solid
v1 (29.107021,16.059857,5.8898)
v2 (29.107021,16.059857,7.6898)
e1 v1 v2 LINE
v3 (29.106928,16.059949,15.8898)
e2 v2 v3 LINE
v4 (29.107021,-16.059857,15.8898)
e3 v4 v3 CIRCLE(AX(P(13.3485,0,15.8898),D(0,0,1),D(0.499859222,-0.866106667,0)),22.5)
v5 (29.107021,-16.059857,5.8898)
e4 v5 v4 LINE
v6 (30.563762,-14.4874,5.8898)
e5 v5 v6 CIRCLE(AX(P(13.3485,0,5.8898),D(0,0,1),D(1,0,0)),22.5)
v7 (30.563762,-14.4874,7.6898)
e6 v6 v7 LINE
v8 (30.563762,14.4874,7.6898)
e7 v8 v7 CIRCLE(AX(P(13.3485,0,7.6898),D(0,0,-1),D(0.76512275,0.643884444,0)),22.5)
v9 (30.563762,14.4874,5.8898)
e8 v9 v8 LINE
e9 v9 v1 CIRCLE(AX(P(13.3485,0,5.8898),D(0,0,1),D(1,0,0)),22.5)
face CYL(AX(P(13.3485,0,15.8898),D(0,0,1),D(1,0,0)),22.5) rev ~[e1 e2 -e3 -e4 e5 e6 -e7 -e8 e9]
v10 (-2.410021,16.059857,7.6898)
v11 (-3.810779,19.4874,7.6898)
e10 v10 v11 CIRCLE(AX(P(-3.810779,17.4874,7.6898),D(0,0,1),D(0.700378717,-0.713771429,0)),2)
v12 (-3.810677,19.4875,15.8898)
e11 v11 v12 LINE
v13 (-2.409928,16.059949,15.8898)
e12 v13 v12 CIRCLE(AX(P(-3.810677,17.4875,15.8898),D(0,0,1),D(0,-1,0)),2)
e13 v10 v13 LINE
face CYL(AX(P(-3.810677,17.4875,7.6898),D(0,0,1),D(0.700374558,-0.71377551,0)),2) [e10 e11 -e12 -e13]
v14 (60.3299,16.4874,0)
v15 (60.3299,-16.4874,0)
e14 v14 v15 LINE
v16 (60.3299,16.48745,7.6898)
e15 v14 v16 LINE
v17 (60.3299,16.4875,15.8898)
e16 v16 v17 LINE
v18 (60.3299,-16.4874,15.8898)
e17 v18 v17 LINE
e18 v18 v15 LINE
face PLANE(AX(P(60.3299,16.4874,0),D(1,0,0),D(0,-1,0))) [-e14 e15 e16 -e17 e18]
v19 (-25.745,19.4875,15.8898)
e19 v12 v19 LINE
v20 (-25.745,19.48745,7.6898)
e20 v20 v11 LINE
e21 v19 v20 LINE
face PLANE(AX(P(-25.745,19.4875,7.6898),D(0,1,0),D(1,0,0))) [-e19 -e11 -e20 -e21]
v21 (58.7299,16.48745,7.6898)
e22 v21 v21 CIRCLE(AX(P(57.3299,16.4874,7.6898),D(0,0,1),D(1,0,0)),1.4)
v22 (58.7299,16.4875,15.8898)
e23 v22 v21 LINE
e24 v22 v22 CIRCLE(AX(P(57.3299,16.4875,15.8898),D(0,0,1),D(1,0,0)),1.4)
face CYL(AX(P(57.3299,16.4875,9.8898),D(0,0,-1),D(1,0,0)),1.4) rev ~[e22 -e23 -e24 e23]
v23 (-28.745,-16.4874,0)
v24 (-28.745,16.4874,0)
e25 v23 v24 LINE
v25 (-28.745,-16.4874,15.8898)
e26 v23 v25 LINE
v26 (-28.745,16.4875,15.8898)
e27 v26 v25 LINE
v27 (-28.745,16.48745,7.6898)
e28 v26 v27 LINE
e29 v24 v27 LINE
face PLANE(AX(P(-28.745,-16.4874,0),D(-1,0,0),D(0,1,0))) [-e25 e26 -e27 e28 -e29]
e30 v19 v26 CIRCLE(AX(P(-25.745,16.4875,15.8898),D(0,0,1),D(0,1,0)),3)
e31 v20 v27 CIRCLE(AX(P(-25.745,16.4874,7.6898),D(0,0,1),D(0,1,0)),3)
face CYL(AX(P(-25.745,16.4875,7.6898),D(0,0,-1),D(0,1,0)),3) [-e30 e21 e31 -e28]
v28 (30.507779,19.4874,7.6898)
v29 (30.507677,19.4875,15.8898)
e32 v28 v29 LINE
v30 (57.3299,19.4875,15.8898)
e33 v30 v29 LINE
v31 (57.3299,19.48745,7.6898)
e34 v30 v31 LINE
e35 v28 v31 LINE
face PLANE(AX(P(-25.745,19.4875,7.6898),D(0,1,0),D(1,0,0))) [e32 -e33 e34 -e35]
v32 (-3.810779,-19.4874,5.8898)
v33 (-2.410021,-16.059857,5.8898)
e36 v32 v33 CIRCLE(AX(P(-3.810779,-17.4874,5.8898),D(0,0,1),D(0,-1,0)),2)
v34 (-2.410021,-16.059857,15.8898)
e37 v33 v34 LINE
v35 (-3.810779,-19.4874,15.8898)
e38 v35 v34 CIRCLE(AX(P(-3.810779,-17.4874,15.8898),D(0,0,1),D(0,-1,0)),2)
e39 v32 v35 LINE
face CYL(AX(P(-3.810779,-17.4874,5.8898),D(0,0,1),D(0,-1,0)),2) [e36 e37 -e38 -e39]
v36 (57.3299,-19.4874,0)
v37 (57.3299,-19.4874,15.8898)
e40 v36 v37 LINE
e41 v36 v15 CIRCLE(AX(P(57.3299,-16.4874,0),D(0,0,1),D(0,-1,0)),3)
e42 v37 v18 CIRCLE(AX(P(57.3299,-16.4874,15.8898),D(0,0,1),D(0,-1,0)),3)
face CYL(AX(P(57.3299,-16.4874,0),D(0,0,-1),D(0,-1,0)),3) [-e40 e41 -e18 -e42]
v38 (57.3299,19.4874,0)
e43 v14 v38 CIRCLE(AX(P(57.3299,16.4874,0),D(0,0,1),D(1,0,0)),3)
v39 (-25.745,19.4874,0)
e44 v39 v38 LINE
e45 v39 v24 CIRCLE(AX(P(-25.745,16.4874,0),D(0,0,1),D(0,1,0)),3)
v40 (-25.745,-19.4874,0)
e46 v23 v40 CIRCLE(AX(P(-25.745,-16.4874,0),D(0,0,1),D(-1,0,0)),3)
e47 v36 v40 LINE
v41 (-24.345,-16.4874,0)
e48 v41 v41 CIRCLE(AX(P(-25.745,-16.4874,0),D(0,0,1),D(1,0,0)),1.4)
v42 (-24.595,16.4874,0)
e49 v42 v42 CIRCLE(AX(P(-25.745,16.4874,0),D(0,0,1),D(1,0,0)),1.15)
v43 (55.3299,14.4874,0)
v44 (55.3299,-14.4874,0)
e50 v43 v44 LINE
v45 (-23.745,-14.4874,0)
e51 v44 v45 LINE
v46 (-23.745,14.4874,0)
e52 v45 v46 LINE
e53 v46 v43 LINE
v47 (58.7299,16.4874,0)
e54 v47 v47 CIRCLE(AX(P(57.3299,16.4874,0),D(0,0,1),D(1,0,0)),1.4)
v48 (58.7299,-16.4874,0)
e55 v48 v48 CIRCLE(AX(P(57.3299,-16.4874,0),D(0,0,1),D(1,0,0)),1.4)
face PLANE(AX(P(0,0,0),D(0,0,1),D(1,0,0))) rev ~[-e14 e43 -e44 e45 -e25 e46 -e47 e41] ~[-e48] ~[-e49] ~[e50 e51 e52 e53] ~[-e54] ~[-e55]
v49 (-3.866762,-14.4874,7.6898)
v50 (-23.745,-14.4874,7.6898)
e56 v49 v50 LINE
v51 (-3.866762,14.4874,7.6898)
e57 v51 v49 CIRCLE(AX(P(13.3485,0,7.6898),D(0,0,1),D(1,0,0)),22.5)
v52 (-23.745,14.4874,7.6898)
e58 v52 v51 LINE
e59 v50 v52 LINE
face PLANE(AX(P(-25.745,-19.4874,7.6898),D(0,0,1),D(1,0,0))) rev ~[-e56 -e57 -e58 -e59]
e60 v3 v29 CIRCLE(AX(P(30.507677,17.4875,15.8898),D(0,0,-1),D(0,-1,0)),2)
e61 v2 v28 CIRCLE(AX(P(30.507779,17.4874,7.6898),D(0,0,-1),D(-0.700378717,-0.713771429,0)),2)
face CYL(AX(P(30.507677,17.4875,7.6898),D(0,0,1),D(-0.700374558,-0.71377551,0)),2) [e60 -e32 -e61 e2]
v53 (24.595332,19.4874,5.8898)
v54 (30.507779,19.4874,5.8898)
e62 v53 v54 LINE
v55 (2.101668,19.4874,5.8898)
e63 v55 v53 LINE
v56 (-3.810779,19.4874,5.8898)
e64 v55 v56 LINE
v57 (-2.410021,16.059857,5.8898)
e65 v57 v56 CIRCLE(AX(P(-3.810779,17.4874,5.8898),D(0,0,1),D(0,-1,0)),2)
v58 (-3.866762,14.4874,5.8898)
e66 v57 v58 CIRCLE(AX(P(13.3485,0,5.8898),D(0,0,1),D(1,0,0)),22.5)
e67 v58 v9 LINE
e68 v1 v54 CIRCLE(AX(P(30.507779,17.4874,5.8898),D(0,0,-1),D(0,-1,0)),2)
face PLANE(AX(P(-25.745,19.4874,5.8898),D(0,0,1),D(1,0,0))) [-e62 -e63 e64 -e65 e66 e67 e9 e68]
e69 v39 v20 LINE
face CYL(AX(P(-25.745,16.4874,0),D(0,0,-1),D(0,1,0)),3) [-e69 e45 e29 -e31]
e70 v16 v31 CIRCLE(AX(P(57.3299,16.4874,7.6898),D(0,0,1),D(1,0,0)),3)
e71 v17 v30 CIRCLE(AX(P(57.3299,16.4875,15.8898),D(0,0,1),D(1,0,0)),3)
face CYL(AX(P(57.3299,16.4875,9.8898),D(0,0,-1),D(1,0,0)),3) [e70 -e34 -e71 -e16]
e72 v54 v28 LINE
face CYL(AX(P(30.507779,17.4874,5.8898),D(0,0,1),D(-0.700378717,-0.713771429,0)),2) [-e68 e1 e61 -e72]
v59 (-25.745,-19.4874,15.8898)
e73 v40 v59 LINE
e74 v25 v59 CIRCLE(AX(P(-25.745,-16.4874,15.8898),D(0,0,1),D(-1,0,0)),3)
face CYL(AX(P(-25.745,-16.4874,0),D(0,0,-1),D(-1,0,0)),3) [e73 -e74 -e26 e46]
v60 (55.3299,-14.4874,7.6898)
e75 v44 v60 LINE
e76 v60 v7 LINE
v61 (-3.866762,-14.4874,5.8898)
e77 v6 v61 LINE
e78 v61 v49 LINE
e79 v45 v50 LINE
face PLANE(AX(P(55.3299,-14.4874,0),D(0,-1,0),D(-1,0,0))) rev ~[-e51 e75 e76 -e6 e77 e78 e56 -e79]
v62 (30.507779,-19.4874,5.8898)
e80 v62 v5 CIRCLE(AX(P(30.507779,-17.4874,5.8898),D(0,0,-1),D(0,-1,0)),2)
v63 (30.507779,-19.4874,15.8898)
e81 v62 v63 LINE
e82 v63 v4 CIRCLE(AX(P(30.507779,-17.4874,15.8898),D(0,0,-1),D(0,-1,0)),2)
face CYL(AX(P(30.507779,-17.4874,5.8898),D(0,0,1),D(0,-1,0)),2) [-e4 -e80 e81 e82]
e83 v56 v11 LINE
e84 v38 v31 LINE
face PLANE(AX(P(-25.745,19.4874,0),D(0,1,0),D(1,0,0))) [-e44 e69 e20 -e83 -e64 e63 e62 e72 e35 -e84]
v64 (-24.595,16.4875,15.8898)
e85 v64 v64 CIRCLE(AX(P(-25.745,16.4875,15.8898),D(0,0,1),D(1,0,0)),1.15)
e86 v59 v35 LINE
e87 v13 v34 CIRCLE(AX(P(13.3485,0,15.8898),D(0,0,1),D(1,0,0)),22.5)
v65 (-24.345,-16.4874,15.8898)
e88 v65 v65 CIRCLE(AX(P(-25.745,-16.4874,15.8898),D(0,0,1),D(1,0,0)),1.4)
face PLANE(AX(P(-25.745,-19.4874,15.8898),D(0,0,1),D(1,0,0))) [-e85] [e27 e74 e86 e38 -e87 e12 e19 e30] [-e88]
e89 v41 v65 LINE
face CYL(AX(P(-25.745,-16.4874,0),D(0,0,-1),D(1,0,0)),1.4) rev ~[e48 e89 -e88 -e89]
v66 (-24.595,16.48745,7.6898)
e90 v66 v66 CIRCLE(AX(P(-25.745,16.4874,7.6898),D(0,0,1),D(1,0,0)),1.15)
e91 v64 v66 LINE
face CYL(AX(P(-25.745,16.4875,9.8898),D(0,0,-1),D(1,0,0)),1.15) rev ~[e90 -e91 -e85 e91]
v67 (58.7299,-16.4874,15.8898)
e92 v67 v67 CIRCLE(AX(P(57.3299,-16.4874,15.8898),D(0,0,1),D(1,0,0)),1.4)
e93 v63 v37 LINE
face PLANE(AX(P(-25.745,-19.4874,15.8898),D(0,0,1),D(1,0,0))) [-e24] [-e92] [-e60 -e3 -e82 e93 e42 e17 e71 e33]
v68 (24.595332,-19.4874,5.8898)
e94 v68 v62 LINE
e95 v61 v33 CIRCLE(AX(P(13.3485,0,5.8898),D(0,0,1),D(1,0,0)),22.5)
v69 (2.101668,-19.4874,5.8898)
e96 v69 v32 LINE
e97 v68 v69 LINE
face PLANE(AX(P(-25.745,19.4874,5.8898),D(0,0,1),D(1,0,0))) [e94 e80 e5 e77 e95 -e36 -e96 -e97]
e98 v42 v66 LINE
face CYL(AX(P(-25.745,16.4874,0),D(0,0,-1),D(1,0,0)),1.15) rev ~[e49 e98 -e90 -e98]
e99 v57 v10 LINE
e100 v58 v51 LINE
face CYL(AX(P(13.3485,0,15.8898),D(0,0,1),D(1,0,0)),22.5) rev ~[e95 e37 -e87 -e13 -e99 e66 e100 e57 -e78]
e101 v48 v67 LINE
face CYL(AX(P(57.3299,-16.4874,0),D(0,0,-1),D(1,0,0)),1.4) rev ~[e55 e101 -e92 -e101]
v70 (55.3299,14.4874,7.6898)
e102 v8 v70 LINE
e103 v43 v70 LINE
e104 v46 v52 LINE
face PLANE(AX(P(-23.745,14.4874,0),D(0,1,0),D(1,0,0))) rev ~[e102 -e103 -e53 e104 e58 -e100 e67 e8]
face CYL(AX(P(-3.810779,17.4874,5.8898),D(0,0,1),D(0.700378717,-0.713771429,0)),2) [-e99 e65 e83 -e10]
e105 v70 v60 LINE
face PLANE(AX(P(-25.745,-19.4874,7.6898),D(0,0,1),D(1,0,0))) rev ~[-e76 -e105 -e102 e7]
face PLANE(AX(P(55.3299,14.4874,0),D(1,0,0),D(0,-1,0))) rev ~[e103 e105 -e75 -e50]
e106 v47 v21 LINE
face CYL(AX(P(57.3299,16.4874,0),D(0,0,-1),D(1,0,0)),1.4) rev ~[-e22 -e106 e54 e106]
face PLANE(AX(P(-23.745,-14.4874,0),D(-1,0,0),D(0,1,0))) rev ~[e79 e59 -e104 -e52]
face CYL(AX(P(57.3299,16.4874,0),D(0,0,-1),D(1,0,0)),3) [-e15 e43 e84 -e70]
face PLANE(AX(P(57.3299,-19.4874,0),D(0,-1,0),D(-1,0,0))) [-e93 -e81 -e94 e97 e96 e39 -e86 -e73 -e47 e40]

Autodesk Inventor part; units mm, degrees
ref_plane "YZ Plane" through (0, 0, 0) normal (1, 0, 0) x (0, 1, 0)
ref_plane "Arbeitsebene1" through (0, 0, 0) normal (0, 0, 1) x (1, 0, 0)
sketch "Skizze1" plane through (0, 0, 0) normal (0, 0, 1) x (1, 0, 0)
  circle A0 centre (57.3299, 16.4874) radius 1.4 projected
  circle A1 centre (-25.745, -16.4874) radius 1.4 projected
  circle A2 centre (57.3299, -16.4874) radius 1.4 projected
  circle A3 centre (-25.745, 16.4874) radius 1.15 projected
  circle A4 centre (9.875, 11.6896) radius 0.65 projected
  circle A5 centre (9.875, -11.3104) radius 0.65 projected
  circle A6 centre (14.955, 11.6896) radius 0.65 projected
  circle A7 centre (14.955, -11.3104) radius 0.65 projected
  circle A8 centre (25.115, 11.6896) radius 0.65 projected
  circle A9 centre (25.115, -11.3104) radius 0.65 projected
  circle A10 centre (30.195, 11.6896) radius 0.65 projected
  circle A11 centre (30.195, -11.3104) radius 0.65 projected
  circle A12 centre (-2.825, -11.3104) radius 0.65 projected
  circle A13 centre (-2.825, 11.6896) radius 0.65 projected
  circle A14 centre (-0.285, -11.3104) radius 0.65 projected
  circle A15 centre (-0.285, 11.6896) radius 0.65 projected
  circle A16 centre (2.255, -11.3104) radius 0.65 projected
  circle A17 centre (2.255, 11.6896) radius 0.65 projected
  circle A18 centre (4.795, -11.3104) radius 0.65 projected
  circle A19 centre (4.795, 11.6896) radius 0.65 projected
  circle A20 centre (27.655, -11.3104) radius 0.65 projected
  circle A21 centre (27.655, 11.6896) radius 0.65 projected
  circle A22 centre (22.575, -11.3104) radius 0.65 projected
  circle A23 centre (22.575, 11.6896) radius 0.65 projected
  circle A24 centre (17.495, -11.3104) radius 0.65 projected
  circle A25 centre (17.495, 11.6896) radius 0.65 projected
  circle A26 centre (12.415, -11.3104) radius 0.65 projected
  circle A27 centre (12.415, 11.6896) radius 0.65 projected
  circle A28 centre (7.335, -11.3104) radius 0.65 projected
  circle A29 centre (7.335, 11.6896) radius 0.65 projected
  circle A30 centre (20.035, 11.6896) radius 0.65 projected
  circle A31 centre (20.035, -11.3104) radius 0.65 projected
  arc A32 (-28.745, -16.4874) -> (-25.745, -19.4874) centre (-25.745, -16.4874) ccw projected
  line L0 (57.3299, -19.4874) -> (-25.745, -19.4874) projected
  arc A33 (57.3299, -19.4874) -> (60.3299, -16.4874) centre (57.3299, -16.4874) ccw projected
  line L1 (60.3299, 16.4874) -> (60.3299, -16.4874) projected
  arc A34 (60.3299, 16.4874) -> (57.3299, 19.4874) centre (57.3299, 16.4874) ccw projected
  line L2 (-25.745, 19.4874) -> (57.3299, 19.4874) projected
  arc A35 (-25.745, 19.4874) -> (-28.745, 16.4874) centre (-25.745, 16.4874) ccw projected
  line L3 (-28.745, -16.4874) -> (-28.745, 16.4874) projected
  line L4 (55.3299, 14.4874) -> (55.3299, -14.4874)
  line L5 (55.3299, -14.4874) -> (-23.745, -14.4874)
  line L6 (-23.745, -14.4874) -> (-23.745, 14.4874)
  line L7 (-23.745, 14.4874) -> (55.3299, 14.4874)
  point P0 (0, 0)
  dimension "d0" = 5
ref_plane "Arbeitsebene2" through (-3.9015, -6.25, 7.6898) normal (0, 0, 1) x (1, 0, 0)
extrude "Extrusion1" add sketch "Skizze1" along normal up to surface (7.6898 mm away) contours L3 A35 L2 A34 L1 A33 L0 A32
sketch "Skizze2" plane through (-25.745, -19.4874, 7.6898) normal (0, 0, 1) x (1, 0, 0)
  circle A0 centre (83.0749, 35.9749) radius 1.4 projected
  circle A1 centre (0, 3) radius 1.4 projected
  circle A2 centre (83.0749, 3) radius 1.4 projected
  circle A3 centre (0, 35.9749) radius 1.15 projected
  line L0 (81.0749, 33.9749) -> (2, 33.9749) projected
  line L1 (81.0749, 5) -> (81.0749, 33.9749) projected
  line L2 (2, 5) -> (81.0749, 5) projected
  line L3 (2, 33.9749) -> (2, 5) projected
  arc A4 (0, 38.9749) -> (-3, 35.9749) centre (0, 35.9749) ccw projected
  line L4 (-3, 3) -> (-3, 35.9749) projected
  arc A5 (-3, 3) -> (0, 0) centre (0, 3) ccw projected
  line L5 (83.0749, 0) -> (0, 0) projected
  arc A6 (83.0749, 0) -> (86.0749, 3) centre (83.0749, 3) ccw projected
  line L6 (86.0749, 35.9749) -> (86.0749, 3) projected
  arc A7 (86.0749, 35.9749) -> (83.0749, 38.9749) centre (83.0749, 35.9749) ccw projected
  line L7 (0, 38.9749) -> (83.0749, 38.9749) projected
  circle A8 centre (39.0935, 19.4874) radius 3.8655 projected
  line L8 (43.0093, 18.0044) -> (43.0093, 15.5716) projected
  line L9 (43.0093, 15.322) -> (35.1777, 15.322) projected
  line L10 (35.1777, 23.4033) -> (37.6105, 23.4033) projected
  line L11 (34.9281, 15.5716) -> (34.9281, 23.4033) projected
  line L12 (43.3435, 23.4874) -> (43.3435, 15.4874) projected
  line L13 (35.0935, 23.7374) -> (43.0935, 23.7374) projected
  line L14 (34.9281, 15.5716) -> (34.9281, 23.4033) projected
  line L15 (34.9935, 15.3874) -> (43.1935, 15.3874)
  line L16 (43.1935, 15.3874) -> (43.1935, 23.5874)
  line L17 (43.1935, 23.5874) -> (34.9935, 23.5874)
  line L18 (34.9935, 23.5874) -> (34.9935, 15.3874)
  line L19 (34.9935, 15.3874) -> (43.1935, 23.5874) construction
  line L20 (43.1935, 15.3874) -> (34.9935, 23.5874) construction
  point P0 (25.745, 19.4874)
  dimension "d3" = 8.2
  dimension "d4" = 8.2
extrude "Extrusion2" add sketch "Skizze2" along normal blind 2.2 contours L1 L2 L3 L0 | L7 A7 L6 A6 L5 A5 L4 A4
ref_plane "Arbeitsebene3" through (-21.9576, -12.7, 16.9028) normal (0, 0, -1) x (0, 1, 0)
sketch "Skizze3" plane through (-25.745, -19.4874, 9.8898) normal (0, 0, 1) x (1, 0, 0)
  line L0 (83.0749, 38.9749) -> (0, 38.9749) projected
  arc A0 (0, 38.9749) -> (-3, 35.9749) centre (0, 35.9749) ccw projected
  line L1 (-3, 35.9749) -> (-3, 3) projected
  arc A1 (-3, 3) -> (0, 0) centre (0, 3) ccw projected
  line L2 (0, 0) -> (83.0749, 0) projected
  arc A2 (83.0749, 0) -> (86.0749, 3) centre (83.0749, 3) ccw projected
  line L3 (86.0749, 3) -> (86.0749, 35.9749) projected
  arc A3 (86.0749, 35.9749) -> (83.0749, 38.9749) centre (83.0749, 35.9749) ccw projected
  line L4 (34.9935, 15.3874) -> (34.9935, 23.5874) projected
  line L5 (34.9935, 23.5874) -> (43.1935, 23.5874) projected
  line L6 (43.1935, 23.5874) -> (43.1935, 15.3874) projected
  line L7 (43.1935, 15.3874) -> (34.9935, 15.3874) projected
  circle A4 centre (0, 35.9749) radius 1.15 projected
  circle A5 centre (83.0749, 3) radius 1.4 projected
  circle A6 centre (0, 3) radius 1.4 projected
  circle A7 centre (83.0749, 35.9749) radius 1.4 projected
  circle A8 centre (39.0935, 19.4874) radius 3.6158 projected
  circle A9 centre (39.0935, 19.4874) radius 3.475
  point P0 (25.745, 19.4874)
  dimension "d7" = 6.95
extrude "Extrusion3" add sketch "Skizze3" along normal blind 6 contours A3 L3 A2 L2 A1 L1 A0 L0 | L4 L5 L6 L7
sketch "Skizze4" plane through (-25.745, 19.4874, 15.8898) normal (0, 0, 1) x (1, 0, 0)
  circle A0 centre (39.0935, -19.4874) radius 3.6158 projected
  circle A1 centre (39.0935, -19.4874) radius 22.5
  point P0 (25.745, -19.4874)
  dimension "d10" = 45
extrude "Extrusion4" cut sketch "Skizze4" against normal blind 10
ref_plane "Arbeitsebene4" through (-25.745, 0, 0) normal (0, -1, 0) x (1, 0, 0)
fillet "Rundung1" radius 2 4 edges at (2.1017, -19.4874, 10.8898) (24.5952, -19.4874, 10.8898) (2.1017, 19.4874, 10.8898) (24.5952, 19.4874, 10.8898)
thread "Gewinde1" size "M45x1" class "6H" standard "ANSI Metric M Profile" full length
properties part number "ESP32ParasiteMicroscope_middle_v0"
